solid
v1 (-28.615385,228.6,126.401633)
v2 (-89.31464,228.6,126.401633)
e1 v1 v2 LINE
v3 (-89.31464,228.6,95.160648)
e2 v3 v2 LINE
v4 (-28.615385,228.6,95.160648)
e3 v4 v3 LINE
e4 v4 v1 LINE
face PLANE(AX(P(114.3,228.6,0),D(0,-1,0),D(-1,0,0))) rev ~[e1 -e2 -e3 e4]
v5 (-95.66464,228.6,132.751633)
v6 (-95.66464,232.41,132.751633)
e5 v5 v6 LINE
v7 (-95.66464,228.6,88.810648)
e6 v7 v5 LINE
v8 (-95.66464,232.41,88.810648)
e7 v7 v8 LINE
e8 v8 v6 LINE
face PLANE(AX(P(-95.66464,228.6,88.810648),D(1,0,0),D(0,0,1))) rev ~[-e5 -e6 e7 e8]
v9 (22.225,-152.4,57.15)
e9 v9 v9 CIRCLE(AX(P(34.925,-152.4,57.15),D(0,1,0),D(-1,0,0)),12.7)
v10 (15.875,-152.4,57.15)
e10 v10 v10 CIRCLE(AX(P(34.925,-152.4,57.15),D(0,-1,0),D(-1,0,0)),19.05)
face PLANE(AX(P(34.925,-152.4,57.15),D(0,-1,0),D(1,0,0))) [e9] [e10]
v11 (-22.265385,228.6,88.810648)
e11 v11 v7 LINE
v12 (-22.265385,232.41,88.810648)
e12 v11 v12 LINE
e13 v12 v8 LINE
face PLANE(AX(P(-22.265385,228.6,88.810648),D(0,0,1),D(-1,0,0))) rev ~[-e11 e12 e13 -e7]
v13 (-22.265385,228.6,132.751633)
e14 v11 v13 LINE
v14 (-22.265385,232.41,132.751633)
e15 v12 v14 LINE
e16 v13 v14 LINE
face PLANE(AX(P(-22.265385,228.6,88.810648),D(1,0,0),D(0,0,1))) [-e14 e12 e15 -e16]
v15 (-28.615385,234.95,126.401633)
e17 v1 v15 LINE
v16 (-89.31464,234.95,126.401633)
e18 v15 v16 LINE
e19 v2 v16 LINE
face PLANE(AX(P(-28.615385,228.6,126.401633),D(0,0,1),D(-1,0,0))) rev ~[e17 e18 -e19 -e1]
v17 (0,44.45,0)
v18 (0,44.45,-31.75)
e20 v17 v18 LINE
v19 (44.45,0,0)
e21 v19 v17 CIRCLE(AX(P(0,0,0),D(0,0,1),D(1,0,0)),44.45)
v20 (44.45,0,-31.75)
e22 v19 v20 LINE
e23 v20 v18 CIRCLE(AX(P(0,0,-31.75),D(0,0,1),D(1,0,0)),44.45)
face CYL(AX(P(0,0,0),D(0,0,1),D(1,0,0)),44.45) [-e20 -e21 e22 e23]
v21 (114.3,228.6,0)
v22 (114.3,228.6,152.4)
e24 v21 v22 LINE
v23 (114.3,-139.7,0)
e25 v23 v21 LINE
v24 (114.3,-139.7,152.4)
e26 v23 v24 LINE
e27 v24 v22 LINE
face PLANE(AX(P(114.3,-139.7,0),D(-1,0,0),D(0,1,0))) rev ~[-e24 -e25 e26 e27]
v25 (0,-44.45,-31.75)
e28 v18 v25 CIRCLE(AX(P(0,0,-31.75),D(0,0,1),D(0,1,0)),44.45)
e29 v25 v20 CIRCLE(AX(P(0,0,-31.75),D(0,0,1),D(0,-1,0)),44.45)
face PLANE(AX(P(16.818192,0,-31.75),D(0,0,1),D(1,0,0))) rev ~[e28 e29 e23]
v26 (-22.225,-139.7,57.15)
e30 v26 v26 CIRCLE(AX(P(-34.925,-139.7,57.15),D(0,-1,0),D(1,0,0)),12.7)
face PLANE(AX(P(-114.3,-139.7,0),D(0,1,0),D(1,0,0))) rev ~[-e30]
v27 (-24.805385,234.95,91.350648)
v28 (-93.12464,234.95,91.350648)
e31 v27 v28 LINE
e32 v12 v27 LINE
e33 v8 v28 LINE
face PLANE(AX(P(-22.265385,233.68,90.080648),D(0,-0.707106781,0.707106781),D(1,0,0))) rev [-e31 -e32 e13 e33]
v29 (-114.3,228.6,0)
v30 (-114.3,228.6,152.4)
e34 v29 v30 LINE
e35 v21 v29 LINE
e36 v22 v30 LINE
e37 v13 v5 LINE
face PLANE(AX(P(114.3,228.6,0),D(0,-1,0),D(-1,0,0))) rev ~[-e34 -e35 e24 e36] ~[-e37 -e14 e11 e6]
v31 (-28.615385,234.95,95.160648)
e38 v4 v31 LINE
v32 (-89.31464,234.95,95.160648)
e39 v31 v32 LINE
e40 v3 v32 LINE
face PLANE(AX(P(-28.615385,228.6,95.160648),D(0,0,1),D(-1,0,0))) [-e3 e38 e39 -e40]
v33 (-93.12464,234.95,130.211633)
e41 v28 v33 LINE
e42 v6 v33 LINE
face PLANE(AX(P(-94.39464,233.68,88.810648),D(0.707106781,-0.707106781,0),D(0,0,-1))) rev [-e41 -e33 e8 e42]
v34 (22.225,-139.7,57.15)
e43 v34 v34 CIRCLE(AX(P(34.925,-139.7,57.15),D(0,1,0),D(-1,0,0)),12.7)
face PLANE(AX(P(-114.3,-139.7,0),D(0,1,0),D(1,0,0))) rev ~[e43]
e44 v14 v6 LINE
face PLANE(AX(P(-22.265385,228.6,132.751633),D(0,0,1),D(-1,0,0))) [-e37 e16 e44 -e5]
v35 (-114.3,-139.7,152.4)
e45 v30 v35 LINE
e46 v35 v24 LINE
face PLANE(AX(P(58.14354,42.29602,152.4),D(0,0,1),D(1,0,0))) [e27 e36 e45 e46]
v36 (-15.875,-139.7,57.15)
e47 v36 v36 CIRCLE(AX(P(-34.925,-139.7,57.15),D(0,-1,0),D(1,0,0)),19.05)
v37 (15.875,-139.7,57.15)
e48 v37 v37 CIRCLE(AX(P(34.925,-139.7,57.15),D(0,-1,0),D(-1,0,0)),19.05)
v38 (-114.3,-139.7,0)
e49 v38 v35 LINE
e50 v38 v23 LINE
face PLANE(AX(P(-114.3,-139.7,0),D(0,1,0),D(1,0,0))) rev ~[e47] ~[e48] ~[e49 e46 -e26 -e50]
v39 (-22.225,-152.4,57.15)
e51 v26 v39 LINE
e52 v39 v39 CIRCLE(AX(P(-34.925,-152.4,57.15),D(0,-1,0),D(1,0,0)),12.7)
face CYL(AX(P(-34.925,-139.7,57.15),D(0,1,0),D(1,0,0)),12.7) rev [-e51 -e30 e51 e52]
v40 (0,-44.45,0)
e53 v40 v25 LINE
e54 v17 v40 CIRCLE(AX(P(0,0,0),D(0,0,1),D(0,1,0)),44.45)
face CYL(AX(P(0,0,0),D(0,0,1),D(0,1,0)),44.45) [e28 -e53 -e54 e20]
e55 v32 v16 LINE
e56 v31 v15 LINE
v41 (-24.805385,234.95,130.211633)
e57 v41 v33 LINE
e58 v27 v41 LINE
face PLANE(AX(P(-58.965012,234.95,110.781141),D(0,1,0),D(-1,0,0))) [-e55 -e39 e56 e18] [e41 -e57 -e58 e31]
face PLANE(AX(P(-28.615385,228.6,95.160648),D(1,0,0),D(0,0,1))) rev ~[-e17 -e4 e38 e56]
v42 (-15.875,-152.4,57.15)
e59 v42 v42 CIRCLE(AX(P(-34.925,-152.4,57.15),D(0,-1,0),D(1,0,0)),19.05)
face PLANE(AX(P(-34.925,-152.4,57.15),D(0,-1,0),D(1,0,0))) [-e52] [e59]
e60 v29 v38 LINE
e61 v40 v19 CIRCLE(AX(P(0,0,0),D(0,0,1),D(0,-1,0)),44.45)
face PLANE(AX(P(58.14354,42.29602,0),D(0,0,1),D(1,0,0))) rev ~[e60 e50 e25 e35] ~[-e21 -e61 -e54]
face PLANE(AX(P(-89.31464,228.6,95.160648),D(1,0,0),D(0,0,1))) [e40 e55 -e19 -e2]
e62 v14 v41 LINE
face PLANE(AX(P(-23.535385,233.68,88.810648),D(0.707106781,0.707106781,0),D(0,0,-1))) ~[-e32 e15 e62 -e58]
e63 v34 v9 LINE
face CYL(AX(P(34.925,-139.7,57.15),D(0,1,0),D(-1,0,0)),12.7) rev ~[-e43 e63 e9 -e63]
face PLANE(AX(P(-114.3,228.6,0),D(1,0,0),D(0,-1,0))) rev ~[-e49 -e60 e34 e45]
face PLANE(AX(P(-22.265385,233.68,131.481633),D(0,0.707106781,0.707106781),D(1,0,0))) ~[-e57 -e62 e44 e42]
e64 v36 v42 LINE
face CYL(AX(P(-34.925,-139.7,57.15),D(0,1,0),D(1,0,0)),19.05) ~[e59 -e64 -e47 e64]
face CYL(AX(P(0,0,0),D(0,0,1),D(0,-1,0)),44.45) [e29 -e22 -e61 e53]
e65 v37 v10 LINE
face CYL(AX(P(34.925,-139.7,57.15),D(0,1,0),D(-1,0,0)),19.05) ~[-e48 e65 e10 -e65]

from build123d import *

# Parameters (mm, degrees)
F1_DEPTH = 152.4
F2_DEPTH = 31.75
F3_W     = 73.3992542744
F3_H     = 43.9409847975
F3_W_2   = 60.6992542744
F3_H_2   = 31.2409847975
F4_DEPTH = 6.35
F5_SIZE  = 2.54
F6_R     = 19.05
F6_R_2   = 12.7
F7_DEPTH = 12.7


# Not quite as in the source:
# - a feature names something its author has since deleted; it is built from what else it names


with BuildPart() as f1:
    # F0 (on Top) → F1 (new body)
    with BuildSketch(Plane.XY):
        with BuildLine():
            Line((0, 228.6), (0, 44.45))
            ThreePointArc((0, 44.45), (31.4308964237, 31.4308964237), (44.45, 0))
            ThreePointArc((44.45, 0), (31.4308964237, -31.4308964237), (0, -44.45))
            Line((0, -44.45), (0, -139.7))
            Line((0, -139.7), (114.3, -139.7))
            Line((114.3, -139.7), (114.3, 228.6))
            Line((114.3, 228.6), (0, 228.6))
        make_face()
        with BuildLine():
            ThreePointArc((0, -44.45), (-44.45, 0), (0, 44.45))
            Line((0, 44.45), (0, 228.6))
            Line((0, 228.6), (-114.3, 228.6))
            Line((-114.3, 228.6), (-114.3, -139.7))
            Line((-114.3, -139.7), (0, -139.7))
            Line((0, -139.7), (0, -44.45))
        make_face()
        with BuildLine():
            Line((0, 44.45), (0, 0))
            Line((0, 0), (0, -44.45))
            ThreePointArc((0, -44.45), (31.4308964237, -31.4308964237), (44.45, 0))
            ThreePointArc((44.45, 0), (31.4308964237, 31.4308964237), (0, 44.45))
        make_face()
        with BuildLine():
            Line((0, -44.45), (0, 0))
            Line((0, 0), (0, 44.45))
            ThreePointArc((0, 44.45), (-44.45, 0), (0, -44.45))
        make_face()
    extrude(amount=F1_DEPTH)

    # F0 (on Top) → F2 (join)
    with BuildSketch(Plane.XY):
        with BuildLine():
            Line((0, 44.45), (0, 0))
            Line((0, 0), (0, -44.45))
            ThreePointArc((0, -44.45), (31.4308964237, -31.4308964237), (44.45, 0))
            ThreePointArc((44.45, 0), (31.4308964237, 31.4308964237), (0, 44.45))
        make_face()
        with BuildLine():
            Line((0, -44.45), (0, 0))
            Line((0, 0), (0, 44.45))
            ThreePointArc((0, 44.45), (-44.45, 0), (0, -44.45))
        make_face()
    extrude(amount=-F2_DEPTH)

    # F3 (on face) → F4 (join)
    with BuildSketch(Plane(origin=(0, 228.6, 0), x_dir=(-1, 0, 0), z_dir=(0, 1, 0))):
        with Locations((58.9650124311, 110.7811406255)):
            Rectangle(F3_W, F3_H)
        with Locations((58.9650124311, 110.7811406255)):
            Rectangle(F3_W_2, F3_H_2, mode=Mode.SUBTRACT)
    extrude(amount=F4_DEPTH)

    # F5
    f5_edges = [f1.edges().sort_by_distance(p)[0] for p in [
        (-95.66464, 234.95, 110.781141),
        (-58.965012, 234.95, 88.810648),
        (-22.265385, 234.95, 110.781141),
        (-58.965012, 234.95, 132.751633),
    ]]
    chamfer(f5_edges, length=F5_SIZE)

    # F6 (on face) → F7 (join)
    with BuildSketch(Plane.XZ.offset(139.7)):
        with BuildLine():
            ThreePointArc((53.975, 57.15), (34.925, 76.2), (15.875, 57.15))
            ThreePointArc((15.875, 57.15), (34.925, 38.1), (53.975, 57.15))
        make_face()
        with BuildLine():
            ThreePointArc((47.625, 57.15), (34.925, 44.45), (22.225, 57.15))
            ThreePointArc((22.225, 57.15), (34.925, 69.85), (47.625, 57.15))
        make_face(mode=Mode.SUBTRACT)
        with Locations((-34.925, 57.15)):
            Circle(F6_R)
        with Locations((-34.925, 57.15)):
            Circle(F6_R_2, mode=Mode.SUBTRACT)
    extrude(amount=F7_DEPTH)


solid = f1.part
